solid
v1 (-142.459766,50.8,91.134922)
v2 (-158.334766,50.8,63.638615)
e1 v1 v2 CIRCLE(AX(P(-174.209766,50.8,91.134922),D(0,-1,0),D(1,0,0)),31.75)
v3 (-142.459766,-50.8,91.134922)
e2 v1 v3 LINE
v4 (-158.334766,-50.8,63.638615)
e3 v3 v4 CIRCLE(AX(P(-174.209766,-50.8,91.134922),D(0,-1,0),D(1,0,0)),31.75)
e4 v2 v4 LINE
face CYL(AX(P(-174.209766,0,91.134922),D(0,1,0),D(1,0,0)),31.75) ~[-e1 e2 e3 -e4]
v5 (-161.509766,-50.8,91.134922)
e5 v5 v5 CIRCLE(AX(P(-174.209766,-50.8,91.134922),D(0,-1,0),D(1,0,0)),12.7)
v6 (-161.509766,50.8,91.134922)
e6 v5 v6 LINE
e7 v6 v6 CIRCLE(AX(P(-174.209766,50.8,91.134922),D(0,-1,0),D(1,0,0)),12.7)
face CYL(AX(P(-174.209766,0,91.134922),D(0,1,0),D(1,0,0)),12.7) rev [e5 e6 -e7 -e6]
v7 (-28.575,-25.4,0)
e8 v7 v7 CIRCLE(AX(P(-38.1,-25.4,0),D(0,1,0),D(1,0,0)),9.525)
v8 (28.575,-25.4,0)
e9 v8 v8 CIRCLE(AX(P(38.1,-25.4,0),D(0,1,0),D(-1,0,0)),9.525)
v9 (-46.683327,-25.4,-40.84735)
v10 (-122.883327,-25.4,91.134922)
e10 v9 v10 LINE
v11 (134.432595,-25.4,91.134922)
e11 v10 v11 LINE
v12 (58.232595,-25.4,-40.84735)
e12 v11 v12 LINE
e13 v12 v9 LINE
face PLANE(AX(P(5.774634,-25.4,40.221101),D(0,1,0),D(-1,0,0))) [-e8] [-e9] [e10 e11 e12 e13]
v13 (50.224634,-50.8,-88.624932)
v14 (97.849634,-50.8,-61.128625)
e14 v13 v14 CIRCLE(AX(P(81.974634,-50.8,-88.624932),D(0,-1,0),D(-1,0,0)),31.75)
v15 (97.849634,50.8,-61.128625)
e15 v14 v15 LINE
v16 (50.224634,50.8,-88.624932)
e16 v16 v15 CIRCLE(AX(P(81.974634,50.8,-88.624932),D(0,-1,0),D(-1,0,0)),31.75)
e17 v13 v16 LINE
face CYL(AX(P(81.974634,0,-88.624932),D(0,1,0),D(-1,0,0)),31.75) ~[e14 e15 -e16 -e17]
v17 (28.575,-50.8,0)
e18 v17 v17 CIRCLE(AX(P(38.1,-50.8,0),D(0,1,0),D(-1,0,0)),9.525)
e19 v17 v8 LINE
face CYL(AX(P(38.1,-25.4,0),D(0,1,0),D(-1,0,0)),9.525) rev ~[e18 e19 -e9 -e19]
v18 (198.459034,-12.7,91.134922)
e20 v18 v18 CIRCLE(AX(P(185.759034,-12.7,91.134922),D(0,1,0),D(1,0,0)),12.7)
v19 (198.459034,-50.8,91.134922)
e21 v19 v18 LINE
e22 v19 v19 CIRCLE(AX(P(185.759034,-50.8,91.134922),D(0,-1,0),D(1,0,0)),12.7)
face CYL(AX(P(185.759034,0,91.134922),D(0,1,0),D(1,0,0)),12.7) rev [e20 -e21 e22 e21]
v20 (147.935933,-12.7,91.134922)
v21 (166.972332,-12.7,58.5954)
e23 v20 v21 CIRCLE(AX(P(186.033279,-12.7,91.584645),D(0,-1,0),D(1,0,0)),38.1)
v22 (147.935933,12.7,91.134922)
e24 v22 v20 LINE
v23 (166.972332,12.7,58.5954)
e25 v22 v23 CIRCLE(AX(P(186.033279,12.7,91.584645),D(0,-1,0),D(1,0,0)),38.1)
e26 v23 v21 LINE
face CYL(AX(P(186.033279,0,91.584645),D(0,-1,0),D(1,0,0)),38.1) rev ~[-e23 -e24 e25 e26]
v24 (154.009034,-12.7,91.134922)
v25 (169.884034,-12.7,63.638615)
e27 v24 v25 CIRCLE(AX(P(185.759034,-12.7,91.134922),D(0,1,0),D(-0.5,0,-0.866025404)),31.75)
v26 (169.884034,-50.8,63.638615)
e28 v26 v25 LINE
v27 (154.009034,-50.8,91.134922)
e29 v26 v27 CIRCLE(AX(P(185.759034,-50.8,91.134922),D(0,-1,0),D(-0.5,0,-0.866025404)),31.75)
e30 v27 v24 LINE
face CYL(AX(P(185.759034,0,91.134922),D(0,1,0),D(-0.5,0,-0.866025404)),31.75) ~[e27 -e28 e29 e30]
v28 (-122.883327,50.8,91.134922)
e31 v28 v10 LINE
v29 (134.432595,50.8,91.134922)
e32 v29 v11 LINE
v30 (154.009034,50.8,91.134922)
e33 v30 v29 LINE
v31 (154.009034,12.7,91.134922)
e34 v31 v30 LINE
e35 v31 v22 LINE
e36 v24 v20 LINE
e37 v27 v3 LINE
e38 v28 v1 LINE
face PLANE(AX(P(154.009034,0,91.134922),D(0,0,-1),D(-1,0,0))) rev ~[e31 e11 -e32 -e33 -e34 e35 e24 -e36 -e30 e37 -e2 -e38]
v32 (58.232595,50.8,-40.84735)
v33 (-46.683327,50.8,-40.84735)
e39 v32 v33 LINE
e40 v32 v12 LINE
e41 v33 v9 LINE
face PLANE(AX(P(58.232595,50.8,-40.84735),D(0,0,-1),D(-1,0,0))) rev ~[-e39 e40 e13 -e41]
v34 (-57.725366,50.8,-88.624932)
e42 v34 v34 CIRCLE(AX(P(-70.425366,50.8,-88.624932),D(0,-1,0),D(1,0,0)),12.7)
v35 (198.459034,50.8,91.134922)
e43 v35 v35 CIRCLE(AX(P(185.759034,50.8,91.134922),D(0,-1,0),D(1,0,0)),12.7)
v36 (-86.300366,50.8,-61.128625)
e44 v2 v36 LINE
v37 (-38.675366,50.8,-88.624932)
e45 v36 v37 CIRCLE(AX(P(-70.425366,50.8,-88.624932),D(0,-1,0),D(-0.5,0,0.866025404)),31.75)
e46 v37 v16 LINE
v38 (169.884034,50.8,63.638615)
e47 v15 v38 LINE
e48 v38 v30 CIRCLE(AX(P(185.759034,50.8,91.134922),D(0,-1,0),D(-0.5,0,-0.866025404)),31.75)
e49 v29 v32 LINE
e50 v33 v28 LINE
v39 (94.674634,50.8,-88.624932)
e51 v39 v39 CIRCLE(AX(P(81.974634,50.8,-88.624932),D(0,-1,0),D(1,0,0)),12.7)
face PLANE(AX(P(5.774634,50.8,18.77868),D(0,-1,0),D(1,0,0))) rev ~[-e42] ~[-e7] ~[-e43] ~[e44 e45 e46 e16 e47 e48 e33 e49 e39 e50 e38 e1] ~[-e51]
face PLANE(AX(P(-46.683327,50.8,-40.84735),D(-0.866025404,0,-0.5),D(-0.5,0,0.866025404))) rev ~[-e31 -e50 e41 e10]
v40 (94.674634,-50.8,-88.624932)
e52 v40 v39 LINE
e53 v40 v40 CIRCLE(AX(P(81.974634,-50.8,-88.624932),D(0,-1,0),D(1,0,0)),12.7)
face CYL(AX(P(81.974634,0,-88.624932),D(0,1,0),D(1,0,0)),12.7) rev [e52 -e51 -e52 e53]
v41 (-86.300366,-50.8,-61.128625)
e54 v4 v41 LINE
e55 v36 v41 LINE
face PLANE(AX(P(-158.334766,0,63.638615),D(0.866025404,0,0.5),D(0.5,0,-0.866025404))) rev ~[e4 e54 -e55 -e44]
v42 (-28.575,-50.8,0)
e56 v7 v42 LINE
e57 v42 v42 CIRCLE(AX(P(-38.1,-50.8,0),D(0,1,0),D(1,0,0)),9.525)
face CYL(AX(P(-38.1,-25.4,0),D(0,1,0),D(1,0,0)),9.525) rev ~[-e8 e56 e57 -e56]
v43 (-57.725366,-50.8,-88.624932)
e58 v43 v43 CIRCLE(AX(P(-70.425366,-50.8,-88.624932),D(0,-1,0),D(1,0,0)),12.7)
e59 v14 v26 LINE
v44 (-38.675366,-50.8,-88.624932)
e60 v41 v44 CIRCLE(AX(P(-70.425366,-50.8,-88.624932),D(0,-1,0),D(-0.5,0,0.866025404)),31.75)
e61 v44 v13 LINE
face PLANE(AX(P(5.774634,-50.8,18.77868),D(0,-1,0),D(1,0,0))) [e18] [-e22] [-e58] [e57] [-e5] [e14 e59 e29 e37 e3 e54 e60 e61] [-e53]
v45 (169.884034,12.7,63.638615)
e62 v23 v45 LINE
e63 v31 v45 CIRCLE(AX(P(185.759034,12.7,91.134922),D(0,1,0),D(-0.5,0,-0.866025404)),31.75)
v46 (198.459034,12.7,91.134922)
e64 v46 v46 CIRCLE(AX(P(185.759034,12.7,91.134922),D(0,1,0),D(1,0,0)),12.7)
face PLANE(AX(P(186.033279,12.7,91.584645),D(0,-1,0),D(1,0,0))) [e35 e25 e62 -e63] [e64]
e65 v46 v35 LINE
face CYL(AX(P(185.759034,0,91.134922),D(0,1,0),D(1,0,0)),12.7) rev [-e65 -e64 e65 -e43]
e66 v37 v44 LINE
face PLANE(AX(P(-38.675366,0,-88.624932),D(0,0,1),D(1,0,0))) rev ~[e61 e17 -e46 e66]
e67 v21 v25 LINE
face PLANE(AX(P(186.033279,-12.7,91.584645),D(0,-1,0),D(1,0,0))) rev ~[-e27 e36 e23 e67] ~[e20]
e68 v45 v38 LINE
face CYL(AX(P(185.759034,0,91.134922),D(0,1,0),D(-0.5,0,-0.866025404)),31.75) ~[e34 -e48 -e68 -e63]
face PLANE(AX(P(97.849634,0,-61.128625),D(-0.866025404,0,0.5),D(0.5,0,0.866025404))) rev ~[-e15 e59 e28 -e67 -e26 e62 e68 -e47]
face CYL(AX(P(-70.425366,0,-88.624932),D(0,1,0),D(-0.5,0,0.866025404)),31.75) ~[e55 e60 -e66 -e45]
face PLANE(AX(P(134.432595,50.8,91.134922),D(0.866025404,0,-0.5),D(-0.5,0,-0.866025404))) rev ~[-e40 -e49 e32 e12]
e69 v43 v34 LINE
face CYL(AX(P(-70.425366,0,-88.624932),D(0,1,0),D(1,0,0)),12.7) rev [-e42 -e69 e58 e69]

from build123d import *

# Parameters (mm, degrees)
F0_R     = 12.7
F1_DEPTH = 50.8
F3_DEPTH = 76.2
F4_R     = 38.1
F5_DEPTH = 12.7
F6_R     = 9.525
F7_DEPTH = 42.418


# Not quite as in the source:
# - the program builds the solid bodies; features that only make, move or delete a surface that nothing else refers to are left out


with BuildPart() as f1:
    # F0 (on Front) → F1 (new body, symmetric)
    with BuildSketch(Plane.XZ):
        with BuildLine():
            Line((154.00903388, 91.1349219612), (-142.45976612, 91.1349219612))
            ThreePointArc((-142.45976612, 91.1349219612), (-201.7060726901, 107.0099219612), (-158.33476612, 63.638615391))
            Line((-158.33476612, 63.638615391), (-86.30036612, -61.1286253017))
            ThreePointArc((-86.30036612, -61.1286253017), (-86.30036612, -116.121238442), (-38.67536612, -88.6249318719))
            Line((-38.67536612, -88.6249318719), (50.22463388, -88.6249318719))
            ThreePointArc((50.22463388, -88.6249318719), (97.84963388, -116.121238442), (97.84963388, -61.1286253017))
            Line((97.84963388, -61.1286253017), (169.88403388, 63.638615391))
            ThreePointArc((169.88403388, 63.638615391), (213.2553404502, 107.0099219612), (154.00903388, 91.1349219612))
        make_face()
        with Locations((-70.42536612, -88.6249318719)):
            Circle(F0_R, mode=Mode.SUBTRACT)
        with Locations((81.97463388, -88.6249318719)):
            Circle(F0_R, mode=Mode.SUBTRACT)
        with Locations((-174.20976612, 91.1349219612)):
            Circle(F0_R, mode=Mode.SUBTRACT)
        with Locations((185.75903388, 91.1349219612)):
            Circle(F0_R, mode=Mode.SUBTRACT)
    extrude(amount=-F1_DEPTH, both=True)

    # F2 (on face) → F3 (cut)
    with BuildSketch(Plane(origin=(0, 50.8, 0), x_dir=(-1, 0, 0), z_dir=(0, 1, 0))):
        Polygon((122.883327189, 91.1349219612), (-134.4325949491, 91.1349219612), (-58.2325949491, -40.8473495756), (46.683327189, -40.8473495756), align=None)
    extrude(amount=-F3_DEPTH, mode=Mode.SUBTRACT)

    # F4 (on Front) → F5 (cut, symmetric)
    with BuildSketch(Plane.XZ):
        with Locations((186.0332787037, 91.5846452117)):
            Circle(F4_R)
    extrude(amount=F5_DEPTH, both=True, mode=Mode.SUBTRACT)

    # F6 (on face) → F7 (cut, symmetric)
    with BuildSketch(Plane(origin=(0, -25.4, 0), x_dir=(-1, 0, 0), z_dir=(0, 1, 0))):
        with BuildLine():
            ThreePointArc((47.625, 0), (38.1, 9.525), (28.575, 0))
            ThreePointArc((28.575, 0), (38.1, -9.525), (47.625, 0))
        make_face()
        with Locations((-38.1, 0)):
            Circle(F6_R)
    extrude(amount=F7_DEPTH, both=True, mode=Mode.SUBTRACT)


solid = f1.part
